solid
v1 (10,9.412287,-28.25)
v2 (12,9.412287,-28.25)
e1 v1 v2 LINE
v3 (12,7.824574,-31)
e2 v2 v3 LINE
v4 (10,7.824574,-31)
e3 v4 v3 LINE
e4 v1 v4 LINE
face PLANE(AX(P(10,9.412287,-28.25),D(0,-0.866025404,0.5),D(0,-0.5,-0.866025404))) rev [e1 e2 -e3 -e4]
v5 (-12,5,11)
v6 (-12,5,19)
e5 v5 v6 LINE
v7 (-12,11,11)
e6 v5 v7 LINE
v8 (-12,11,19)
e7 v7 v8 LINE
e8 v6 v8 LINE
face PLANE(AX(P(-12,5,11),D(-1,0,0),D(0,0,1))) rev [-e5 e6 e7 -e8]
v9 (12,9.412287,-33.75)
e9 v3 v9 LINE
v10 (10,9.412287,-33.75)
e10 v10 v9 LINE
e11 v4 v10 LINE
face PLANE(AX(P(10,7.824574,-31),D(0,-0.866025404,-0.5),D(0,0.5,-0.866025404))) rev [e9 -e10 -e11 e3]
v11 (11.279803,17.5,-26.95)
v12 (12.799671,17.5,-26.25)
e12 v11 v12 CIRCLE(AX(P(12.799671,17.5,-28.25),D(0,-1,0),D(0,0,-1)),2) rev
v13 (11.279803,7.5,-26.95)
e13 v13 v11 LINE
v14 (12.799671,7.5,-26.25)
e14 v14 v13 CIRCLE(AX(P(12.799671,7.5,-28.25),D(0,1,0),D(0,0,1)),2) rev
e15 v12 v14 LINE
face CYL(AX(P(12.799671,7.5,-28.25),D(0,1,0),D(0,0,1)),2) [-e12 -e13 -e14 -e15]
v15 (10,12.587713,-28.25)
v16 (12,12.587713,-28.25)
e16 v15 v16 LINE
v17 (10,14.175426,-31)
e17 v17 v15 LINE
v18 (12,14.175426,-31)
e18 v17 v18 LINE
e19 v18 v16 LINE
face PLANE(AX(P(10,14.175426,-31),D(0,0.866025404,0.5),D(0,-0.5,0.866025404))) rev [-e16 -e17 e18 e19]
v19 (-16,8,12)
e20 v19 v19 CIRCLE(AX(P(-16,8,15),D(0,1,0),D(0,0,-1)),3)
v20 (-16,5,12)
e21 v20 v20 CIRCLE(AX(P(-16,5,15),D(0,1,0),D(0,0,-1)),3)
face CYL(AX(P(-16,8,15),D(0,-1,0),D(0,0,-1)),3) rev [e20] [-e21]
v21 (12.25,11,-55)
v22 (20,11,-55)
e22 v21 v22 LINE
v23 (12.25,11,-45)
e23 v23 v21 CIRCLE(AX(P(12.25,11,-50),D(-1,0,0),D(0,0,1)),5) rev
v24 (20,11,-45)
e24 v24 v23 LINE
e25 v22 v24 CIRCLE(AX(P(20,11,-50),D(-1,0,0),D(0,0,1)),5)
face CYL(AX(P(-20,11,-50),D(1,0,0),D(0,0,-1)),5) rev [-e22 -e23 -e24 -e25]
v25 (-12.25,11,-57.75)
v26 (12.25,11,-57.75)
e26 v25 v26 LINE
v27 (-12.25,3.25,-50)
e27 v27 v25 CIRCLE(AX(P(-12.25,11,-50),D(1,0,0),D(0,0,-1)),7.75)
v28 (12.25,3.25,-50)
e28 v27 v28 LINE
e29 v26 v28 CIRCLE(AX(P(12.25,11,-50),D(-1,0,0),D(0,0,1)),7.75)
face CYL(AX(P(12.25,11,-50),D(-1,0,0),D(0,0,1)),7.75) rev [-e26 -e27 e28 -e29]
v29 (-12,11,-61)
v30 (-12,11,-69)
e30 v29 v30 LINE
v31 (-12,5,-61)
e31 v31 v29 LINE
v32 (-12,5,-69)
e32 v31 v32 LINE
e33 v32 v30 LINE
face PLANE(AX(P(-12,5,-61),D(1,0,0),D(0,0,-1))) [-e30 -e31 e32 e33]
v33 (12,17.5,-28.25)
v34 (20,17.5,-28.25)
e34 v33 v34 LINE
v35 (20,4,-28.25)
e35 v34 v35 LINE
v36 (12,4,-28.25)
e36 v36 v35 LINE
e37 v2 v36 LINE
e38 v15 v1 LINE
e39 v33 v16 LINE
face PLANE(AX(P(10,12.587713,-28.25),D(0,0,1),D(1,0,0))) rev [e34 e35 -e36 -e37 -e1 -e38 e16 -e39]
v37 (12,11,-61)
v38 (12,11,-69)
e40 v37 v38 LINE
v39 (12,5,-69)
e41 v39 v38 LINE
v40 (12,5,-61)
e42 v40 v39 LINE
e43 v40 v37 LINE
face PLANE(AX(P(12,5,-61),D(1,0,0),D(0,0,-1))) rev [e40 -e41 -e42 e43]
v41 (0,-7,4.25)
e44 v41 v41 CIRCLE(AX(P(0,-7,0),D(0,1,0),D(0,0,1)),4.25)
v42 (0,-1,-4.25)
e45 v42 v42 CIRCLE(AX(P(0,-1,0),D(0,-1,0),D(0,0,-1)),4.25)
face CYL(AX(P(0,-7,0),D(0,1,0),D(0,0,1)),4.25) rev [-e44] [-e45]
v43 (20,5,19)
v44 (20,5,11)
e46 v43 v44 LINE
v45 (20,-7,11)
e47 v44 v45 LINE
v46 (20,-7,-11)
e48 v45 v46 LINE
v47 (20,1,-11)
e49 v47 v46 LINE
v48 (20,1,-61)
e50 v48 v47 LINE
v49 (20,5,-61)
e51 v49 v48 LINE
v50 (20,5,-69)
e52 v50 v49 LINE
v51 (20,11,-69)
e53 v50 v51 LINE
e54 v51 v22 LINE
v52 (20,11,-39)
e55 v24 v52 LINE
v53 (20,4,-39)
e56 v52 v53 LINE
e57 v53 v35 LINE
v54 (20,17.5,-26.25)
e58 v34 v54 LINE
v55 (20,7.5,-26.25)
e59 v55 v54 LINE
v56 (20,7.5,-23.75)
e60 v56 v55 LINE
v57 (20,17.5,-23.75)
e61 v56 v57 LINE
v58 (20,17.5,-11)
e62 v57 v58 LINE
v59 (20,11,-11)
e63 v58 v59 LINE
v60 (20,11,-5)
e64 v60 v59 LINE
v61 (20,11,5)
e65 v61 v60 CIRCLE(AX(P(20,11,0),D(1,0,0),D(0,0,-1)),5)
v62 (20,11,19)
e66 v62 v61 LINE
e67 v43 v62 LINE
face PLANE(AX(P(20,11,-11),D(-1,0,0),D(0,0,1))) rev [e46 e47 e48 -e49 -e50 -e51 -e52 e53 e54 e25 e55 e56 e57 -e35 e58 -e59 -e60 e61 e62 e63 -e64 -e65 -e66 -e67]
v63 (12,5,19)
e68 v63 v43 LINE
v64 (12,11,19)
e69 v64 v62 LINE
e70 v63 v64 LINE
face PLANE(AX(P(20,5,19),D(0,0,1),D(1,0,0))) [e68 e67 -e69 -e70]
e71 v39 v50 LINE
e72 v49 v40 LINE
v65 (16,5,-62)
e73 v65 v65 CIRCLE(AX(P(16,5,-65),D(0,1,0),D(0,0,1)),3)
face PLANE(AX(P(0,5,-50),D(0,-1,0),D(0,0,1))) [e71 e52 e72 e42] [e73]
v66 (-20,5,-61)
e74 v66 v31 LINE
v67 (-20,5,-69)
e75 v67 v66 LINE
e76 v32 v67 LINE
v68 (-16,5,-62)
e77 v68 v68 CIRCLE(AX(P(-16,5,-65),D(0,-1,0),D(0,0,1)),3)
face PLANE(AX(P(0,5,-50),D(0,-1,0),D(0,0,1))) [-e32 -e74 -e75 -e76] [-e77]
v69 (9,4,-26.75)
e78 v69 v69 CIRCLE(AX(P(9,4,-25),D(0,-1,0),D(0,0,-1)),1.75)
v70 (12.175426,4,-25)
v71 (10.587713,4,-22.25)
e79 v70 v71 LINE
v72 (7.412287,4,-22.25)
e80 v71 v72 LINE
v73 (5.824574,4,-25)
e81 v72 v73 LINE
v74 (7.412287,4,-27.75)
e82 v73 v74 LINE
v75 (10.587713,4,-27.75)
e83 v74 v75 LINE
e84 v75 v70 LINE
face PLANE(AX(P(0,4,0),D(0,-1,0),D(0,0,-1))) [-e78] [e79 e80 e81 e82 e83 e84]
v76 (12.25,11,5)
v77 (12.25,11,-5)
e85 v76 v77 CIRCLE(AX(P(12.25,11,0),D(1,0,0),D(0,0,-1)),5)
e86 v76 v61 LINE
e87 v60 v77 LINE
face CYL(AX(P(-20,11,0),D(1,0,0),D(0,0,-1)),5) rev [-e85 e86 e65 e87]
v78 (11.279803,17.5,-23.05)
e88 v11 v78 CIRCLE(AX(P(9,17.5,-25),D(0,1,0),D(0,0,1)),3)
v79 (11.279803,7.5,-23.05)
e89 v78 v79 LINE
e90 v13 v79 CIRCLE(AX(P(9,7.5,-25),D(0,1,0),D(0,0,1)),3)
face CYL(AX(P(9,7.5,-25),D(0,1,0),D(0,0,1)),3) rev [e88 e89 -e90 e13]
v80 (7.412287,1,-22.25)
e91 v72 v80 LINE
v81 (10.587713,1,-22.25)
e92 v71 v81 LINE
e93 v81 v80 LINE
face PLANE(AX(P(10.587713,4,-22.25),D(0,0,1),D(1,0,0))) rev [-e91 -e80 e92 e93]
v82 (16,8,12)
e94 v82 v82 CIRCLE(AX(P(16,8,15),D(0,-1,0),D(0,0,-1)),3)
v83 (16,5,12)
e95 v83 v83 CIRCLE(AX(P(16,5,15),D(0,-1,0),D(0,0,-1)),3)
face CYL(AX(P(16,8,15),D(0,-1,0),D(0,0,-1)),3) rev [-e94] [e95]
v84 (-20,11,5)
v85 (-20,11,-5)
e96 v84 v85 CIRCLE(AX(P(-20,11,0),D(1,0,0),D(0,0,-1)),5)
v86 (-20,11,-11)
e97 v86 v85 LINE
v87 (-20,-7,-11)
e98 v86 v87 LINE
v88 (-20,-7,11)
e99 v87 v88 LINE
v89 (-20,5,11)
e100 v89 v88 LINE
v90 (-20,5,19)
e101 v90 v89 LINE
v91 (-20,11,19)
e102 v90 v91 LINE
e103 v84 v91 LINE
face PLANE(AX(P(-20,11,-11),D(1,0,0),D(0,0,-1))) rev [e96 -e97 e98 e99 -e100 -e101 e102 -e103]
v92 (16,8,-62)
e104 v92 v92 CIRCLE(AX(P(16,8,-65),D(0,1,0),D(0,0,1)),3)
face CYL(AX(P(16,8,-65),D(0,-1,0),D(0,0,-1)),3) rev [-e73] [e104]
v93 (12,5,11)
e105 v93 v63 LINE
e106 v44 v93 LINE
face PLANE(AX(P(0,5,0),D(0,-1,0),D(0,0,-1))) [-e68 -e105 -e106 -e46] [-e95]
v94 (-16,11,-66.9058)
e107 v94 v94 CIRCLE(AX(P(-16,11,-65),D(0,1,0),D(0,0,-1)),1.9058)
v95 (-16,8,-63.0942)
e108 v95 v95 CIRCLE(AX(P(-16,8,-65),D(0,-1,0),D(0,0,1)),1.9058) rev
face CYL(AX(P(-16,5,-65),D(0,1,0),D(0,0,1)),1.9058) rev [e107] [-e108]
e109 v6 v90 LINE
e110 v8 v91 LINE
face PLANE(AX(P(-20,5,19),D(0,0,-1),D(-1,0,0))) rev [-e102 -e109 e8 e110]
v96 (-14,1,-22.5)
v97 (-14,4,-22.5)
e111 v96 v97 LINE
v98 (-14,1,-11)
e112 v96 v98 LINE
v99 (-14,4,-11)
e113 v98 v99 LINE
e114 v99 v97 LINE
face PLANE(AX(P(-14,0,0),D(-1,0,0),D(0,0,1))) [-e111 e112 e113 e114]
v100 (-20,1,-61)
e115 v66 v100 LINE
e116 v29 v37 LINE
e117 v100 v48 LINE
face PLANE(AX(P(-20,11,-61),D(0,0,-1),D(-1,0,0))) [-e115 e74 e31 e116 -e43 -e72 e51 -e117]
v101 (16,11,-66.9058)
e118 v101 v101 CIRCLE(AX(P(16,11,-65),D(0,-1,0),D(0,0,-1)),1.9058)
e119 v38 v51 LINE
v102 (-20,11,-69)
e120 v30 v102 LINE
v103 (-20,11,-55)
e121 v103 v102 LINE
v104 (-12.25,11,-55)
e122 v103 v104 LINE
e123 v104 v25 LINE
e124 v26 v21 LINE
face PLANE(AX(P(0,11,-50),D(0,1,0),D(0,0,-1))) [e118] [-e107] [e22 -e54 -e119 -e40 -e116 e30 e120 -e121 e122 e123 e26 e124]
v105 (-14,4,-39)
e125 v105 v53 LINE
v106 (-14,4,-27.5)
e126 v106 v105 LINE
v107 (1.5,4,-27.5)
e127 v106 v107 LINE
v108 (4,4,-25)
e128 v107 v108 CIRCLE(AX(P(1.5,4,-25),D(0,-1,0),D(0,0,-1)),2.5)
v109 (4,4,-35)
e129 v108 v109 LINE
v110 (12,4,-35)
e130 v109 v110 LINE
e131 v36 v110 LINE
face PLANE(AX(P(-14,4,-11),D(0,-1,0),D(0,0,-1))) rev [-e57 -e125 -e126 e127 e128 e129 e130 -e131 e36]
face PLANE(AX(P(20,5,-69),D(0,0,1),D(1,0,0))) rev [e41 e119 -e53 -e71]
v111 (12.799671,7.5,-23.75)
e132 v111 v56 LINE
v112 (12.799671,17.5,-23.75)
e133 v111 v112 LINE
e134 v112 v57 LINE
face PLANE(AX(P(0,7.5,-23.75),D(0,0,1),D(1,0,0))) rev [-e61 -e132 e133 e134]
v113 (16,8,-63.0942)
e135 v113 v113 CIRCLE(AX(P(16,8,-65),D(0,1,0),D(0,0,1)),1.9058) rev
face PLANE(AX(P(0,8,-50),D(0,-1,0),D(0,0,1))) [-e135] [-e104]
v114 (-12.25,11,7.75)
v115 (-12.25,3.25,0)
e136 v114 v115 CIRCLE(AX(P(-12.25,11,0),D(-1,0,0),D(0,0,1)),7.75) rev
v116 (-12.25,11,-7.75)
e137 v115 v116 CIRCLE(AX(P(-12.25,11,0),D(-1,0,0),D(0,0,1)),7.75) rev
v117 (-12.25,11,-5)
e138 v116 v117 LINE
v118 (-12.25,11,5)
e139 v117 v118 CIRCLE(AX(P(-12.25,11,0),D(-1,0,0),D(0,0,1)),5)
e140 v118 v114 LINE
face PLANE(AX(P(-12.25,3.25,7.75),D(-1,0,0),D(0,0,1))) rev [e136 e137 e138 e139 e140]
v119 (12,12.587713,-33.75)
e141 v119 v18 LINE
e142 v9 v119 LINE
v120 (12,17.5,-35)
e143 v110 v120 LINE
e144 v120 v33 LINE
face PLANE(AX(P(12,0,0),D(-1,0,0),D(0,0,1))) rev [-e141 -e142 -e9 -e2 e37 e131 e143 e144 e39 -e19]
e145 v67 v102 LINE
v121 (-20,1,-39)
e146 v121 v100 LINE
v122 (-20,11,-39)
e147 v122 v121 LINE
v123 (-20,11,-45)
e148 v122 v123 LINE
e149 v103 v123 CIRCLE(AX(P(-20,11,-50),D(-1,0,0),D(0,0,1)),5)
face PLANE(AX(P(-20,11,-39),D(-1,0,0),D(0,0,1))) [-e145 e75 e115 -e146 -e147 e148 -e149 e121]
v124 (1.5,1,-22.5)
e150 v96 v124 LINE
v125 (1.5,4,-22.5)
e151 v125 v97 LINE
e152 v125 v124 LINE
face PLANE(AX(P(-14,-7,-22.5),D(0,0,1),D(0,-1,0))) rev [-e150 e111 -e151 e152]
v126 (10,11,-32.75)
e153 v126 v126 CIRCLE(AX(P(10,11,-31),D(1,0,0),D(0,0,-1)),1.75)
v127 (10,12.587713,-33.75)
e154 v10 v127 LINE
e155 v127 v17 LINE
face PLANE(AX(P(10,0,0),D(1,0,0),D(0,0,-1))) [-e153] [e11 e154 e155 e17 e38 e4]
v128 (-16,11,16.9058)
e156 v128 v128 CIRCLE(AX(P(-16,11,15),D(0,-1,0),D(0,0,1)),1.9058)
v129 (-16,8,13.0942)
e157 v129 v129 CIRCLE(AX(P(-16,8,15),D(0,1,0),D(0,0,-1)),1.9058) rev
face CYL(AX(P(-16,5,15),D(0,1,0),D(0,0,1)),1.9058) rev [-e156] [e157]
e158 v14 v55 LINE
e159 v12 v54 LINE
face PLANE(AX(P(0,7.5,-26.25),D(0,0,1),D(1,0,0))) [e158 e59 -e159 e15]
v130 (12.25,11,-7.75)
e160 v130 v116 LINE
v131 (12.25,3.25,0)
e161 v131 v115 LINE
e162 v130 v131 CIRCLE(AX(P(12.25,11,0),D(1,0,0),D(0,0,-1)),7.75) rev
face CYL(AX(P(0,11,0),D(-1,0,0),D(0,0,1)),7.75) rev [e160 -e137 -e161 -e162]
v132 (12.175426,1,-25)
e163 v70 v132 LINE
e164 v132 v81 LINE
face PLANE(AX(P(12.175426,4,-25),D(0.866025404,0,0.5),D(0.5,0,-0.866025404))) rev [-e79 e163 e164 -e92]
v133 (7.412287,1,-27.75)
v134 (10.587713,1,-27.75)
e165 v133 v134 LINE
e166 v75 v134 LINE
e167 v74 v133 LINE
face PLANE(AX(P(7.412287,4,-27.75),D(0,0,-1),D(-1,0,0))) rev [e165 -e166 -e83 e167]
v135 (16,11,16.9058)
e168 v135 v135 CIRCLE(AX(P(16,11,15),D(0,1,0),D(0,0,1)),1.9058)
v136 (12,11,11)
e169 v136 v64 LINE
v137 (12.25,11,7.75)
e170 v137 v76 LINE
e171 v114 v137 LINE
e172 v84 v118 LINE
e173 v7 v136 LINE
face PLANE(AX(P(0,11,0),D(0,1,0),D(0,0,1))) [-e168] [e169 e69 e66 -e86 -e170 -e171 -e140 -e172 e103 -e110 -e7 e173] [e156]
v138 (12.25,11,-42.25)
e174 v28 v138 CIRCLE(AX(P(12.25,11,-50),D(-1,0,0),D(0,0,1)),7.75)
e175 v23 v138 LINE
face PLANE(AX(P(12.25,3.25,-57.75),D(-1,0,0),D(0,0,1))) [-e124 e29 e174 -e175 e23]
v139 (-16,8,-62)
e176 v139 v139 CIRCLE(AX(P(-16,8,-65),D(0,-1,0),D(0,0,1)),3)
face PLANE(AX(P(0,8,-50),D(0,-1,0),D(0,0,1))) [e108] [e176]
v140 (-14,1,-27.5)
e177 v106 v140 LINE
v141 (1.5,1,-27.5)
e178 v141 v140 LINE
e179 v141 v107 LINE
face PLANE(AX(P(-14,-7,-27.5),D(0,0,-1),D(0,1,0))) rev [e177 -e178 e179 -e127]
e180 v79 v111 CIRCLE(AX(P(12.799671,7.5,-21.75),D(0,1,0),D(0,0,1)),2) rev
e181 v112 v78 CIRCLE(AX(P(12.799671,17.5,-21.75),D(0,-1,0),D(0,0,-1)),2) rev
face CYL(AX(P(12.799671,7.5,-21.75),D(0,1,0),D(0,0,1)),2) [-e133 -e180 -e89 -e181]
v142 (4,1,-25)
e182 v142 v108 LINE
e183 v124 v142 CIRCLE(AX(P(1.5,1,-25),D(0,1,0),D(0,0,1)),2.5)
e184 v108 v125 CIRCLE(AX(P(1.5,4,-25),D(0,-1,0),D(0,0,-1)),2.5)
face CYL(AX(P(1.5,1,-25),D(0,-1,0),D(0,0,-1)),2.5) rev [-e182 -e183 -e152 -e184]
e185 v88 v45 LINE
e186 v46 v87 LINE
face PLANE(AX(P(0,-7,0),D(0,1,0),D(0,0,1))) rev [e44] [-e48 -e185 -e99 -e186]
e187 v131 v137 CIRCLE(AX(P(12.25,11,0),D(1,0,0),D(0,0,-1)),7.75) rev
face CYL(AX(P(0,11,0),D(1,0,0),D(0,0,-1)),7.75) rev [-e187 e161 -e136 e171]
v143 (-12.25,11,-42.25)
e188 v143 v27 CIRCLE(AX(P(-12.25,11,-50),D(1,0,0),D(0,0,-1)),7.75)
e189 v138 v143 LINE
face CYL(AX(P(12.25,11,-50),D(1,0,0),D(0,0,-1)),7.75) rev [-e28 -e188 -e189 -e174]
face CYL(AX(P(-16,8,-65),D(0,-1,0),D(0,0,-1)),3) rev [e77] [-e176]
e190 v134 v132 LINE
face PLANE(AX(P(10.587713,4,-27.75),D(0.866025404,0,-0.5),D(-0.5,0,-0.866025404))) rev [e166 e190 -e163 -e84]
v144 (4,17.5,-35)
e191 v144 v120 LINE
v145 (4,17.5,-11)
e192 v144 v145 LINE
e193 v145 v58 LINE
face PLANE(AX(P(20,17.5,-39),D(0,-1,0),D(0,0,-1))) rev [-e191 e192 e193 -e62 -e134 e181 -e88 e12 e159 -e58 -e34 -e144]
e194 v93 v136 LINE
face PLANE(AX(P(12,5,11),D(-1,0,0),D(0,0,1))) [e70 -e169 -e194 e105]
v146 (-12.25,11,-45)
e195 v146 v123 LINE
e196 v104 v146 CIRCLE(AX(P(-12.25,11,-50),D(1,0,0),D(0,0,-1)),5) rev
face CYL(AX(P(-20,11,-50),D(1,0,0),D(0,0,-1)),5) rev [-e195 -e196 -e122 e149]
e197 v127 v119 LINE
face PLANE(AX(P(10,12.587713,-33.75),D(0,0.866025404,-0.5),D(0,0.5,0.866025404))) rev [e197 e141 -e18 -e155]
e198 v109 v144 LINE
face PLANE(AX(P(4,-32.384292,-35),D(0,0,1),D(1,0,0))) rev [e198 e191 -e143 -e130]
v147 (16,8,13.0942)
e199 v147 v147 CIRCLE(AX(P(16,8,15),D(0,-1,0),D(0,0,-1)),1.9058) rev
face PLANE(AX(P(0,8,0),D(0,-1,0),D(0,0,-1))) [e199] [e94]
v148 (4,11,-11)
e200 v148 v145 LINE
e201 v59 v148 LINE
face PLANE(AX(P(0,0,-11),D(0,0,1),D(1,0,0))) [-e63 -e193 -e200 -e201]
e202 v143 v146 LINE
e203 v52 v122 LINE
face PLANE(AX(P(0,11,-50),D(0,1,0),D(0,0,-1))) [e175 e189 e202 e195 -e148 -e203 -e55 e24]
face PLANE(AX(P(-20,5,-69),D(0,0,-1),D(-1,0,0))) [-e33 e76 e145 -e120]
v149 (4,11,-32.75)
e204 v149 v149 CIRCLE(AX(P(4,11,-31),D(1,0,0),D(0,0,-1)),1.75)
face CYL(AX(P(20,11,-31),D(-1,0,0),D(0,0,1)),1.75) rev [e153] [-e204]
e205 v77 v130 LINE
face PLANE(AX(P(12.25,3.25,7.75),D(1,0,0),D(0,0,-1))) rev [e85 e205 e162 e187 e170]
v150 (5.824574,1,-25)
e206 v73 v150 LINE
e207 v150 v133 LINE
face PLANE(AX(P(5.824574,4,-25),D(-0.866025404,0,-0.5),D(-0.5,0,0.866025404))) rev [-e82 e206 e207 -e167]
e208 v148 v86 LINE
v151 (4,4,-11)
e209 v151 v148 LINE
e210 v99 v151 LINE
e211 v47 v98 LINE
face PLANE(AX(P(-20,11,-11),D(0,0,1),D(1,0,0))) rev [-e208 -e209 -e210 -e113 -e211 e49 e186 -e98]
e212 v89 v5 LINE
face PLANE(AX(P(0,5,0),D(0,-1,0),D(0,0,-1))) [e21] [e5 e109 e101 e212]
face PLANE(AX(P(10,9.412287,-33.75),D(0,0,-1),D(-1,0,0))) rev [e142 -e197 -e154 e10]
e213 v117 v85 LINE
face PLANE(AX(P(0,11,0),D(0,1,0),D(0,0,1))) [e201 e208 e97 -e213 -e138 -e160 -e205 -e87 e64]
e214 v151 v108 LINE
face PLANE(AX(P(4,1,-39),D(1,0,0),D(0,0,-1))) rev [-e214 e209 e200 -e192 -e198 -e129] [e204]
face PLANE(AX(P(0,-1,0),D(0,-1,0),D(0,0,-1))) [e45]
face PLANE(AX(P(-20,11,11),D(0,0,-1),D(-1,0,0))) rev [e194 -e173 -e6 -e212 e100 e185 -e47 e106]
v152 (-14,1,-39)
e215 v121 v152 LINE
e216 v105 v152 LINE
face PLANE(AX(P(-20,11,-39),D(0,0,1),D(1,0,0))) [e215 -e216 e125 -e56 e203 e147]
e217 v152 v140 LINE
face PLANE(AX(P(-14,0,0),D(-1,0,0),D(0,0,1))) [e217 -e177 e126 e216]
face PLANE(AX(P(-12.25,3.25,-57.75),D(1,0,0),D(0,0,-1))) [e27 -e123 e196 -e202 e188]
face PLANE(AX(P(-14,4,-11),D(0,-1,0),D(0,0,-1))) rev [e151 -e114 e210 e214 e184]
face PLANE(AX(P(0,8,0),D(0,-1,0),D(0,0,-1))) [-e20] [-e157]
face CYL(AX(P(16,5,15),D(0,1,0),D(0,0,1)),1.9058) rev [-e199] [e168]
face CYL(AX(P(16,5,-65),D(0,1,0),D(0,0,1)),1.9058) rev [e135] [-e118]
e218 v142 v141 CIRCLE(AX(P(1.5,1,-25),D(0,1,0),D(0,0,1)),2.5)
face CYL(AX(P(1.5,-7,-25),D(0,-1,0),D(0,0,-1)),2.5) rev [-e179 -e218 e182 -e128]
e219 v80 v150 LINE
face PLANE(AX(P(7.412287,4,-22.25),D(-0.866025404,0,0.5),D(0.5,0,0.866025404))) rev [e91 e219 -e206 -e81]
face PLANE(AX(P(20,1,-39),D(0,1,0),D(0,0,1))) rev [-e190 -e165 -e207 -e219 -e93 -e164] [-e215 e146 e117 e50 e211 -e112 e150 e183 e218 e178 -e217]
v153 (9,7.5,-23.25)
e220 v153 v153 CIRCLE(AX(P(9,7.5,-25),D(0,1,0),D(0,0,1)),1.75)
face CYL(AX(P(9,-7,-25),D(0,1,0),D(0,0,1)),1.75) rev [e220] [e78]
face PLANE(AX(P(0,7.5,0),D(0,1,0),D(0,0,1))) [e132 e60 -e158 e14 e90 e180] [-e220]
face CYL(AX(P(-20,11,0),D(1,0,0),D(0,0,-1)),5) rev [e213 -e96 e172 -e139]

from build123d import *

# Parameters (mm, degrees)
SKETCH1_W                  = 40
SKETCH1_H                  = 22
BOSS_EXTRUDE1_DEPTH        = 11
SKETCH2_W                  = 40
SKETCH2_H                  = 22
SKETCH2_R                  = 4.25
BOSS_EXTRUDE2_DEPTH        = 7
SKETCH3_W                  = 24.5
SKETCH3_H                  = 15.5
CUT_EXTRUDE1_DEPTH         = 7.75
FILLET1_R                  = 7.75
SKETCH4_R                  = 5
CUT_EXTRUDE2_DEPTH         = 36.805900352
SKETCH5_W                  = 8
SKETCH5_H                  = 8
SKETCH5_R                  = 1.905800151
BOSS_EXTRUDE3_DEPTH        = 6
CUT_EXTRUDE3_START         = -3
SKETCH6_R                  = 3
SKETCH6_R_2                = 1.905800151
CUT_EXTRUDE3_DEPTH         = 3
SKETCH7_W                  = 16
SKETCH7_H                  = 16.5
BOSS_EXTRUDE5_DEPTH        = 28
MIRROR14_COPY_1_SKETCH_W   = 8
MIRROR14_COPY_1_SKETCH_H   = 8
MIRROR14_COPY_1_SKETCH_R   = 1.905800151
MIRROR14_COPY_1_DEPTH      = 6
MIRROR14_START             = -3
MIRROR14_COPY_2_SKETCH_R   = 3
MIRROR14_COPY_2_SKETCH_R_2 = 1.905800151
MIRROR14_COPY_2_DEPTH      = 3
FILLET1_OF_MIRROR14_R      = 7.75
SKETCH9_W                  = 28
SKETCH9_H                  = 3
BOSS_EXTRUDE6_DEPTH        = 18
CUT_EXTRUDE4_DEPTH         = 10
CUT_EXTRUDE5_DEPTH         = 74.288812243
CUT_EXTRUDE5_DEPTH_BACK    = 74.288812243
SKETCH11_R                 = 1.75
CUT_EXTRUDE6_DEPTH         = 76.121568141
CUT_EXTRUDE6_DEPTH_BACK    = 76.121568141
SKETCH12_R                 = 1.75
FILLET2_R                  = 2
CUT_EXTRUDE12_START        = -3
SKETCH17_R                 = 1.75
CUT_EXTRUDE12_DEPTH        = 3
CUT_EXTRUDE13_DEPTH        = 74.097537578
CUT_EXTRUDE13_DEPTH_BACK   = 74.097537578
SKETCH18_W                 = 18
SKETCH18_H                 = 5
FILLET3_R                  = 2.5
CUT_EXTRUDE14_DEPTH        = 74.710582687
CUT_EXTRUDE15_START        = -10
SKETCH21_R                 = 1.75
CUT_EXTRUDE15_DEPTH        = 10
SKETCH20_W                 = 36.163748027
SKETCH20_H                 = 4
CUT_EXTRUDE16_DEPTH        = 13.5
SKETCH22_W                 = 6.75
SKETCH22_H                 = 13.5
CUT_EXTRUDE18_DEPTH        = 8
SKETCH23_R                 = 4.25
BOSS_EXTRUDE8_DEPTH        = 1


with BuildPart() as part:
    # Sketch1 → Boss-Extrude1 (new body)
    with BuildSketch(Plane(origin=(0, 0, 0), x_dir=(1, 0, 0), z_dir=(0, 1, 0))):
        Rectangle(SKETCH1_W, SKETCH1_H)
    boss_extrude1 = extrude(amount=BOSS_EXTRUDE1_DEPTH)

    # Sketch2 → Boss-Extrude2 (add)
    with BuildSketch(Plane(origin=(0, 0, 0), x_dir=(1, 0, 0), z_dir=(0, 1, 0))):
        Rectangle(SKETCH2_W, SKETCH2_H)
        with Locations(Location((0, 0, 0), (0, 0, 270))):
            Circle(SKETCH2_R, mode=Mode.SUBTRACT)
    boss_extrude2 = extrude(amount=-BOSS_EXTRUDE2_DEPTH)

    # Sketch3 → Cut-Extrude1 (cut)
    with BuildSketch(Plane(origin=(0, 11, 0), x_dir=(1, 0, 0), z_dir=(0, 1, 0))):
        Rectangle(SKETCH3_W, SKETCH3_H)
    cut_extrude1 = extrude(amount=-CUT_EXTRUDE1_DEPTH, mode=Mode.SUBTRACT)

    # Fillet1
    fillet1_edges = [part.edges().sort_by_distance(p)[0] for p in [
        (0, 3.25, 7.75),
        (0, 3.25, -7.75),
    ]]
    fillet(fillet1_edges, radius=FILLET1_R - 0.0001)  # a hair under: the kernel refuses the full size

    # Sketch4 → Cut-Extrude2 (cut, symmetric)
    with BuildSketch(Plane(origin=(-12.25, 0, 0), x_dir=(0, 0, -1), z_dir=(1, 0, 0))):
        with Locations((0, 11)):
            Circle(SKETCH4_R)
    cut_extrude2 = extrude(amount=CUT_EXTRUDE2_DEPTH, both=True, mode=Mode.SUBTRACT)

    # Sketch5 → Boss-Extrude3 (add)
    with BuildSketch(Plane(origin=(0, 11, 0), x_dir=(1, 0, 0), z_dir=(0, 1, 0))):
        with Locations((16, -15)):
            Rectangle(SKETCH5_W, SKETCH5_H)
        with Locations(Location((16, -15, 0), (0, 0, 270))):
            Circle(SKETCH5_R, mode=Mode.SUBTRACT)
    boss_extrude3 = extrude(amount=-BOSS_EXTRUDE3_DEPTH)

    # Sketch6 → Cut-Extrude3 (cut)
    with BuildSketch(Plane.XZ.offset(-5).offset(CUT_EXTRUDE3_START)):
        with Locations(Location((16, 15, 0), (0, 0, 270))):
            Circle(SKETCH6_R)
        with Locations(Location((16, 15, 0), (0, 0, 90))):
            Circle(SKETCH6_R_2, mode=Mode.SUBTRACT)
    cut_extrude3 = extrude(amount=CUT_EXTRUDE3_DEPTH, mode=Mode.SUBTRACT)

    # Mirror8: Boss-Extrude3, Cut-Extrude3 across plane
    add(boss_extrude3.mirror(Plane(origin=(0, 0, 0), x_dir=(0, 0, 1), z_dir=(1, 0, 0))))
    add(cut_extrude3.mirror(Plane(origin=(0, 0, 0), x_dir=(0, 0, 1), z_dir=(1, 0, 0))), mode=Mode.SUBTRACT)

    # Sketch7 → Boss-Extrude5 (add)
    with BuildSketch(Plane(origin=(0, 0, -11), x_dir=(-1, 0, 0), z_dir=(0, 0, -1))):
        with Locations((-12, 9.25)):
            Rectangle(SKETCH7_W, SKETCH7_H)
    extrude(amount=BOSS_EXTRUDE5_DEPTH)

    # Mirror14: Boss-Extrude1, Boss-Extrude2, Cut-Extrude1, Cut-Extrude2, Boss-Extrude3, Cut-Extrude3 across plane
    add(boss_extrude1.mirror(Plane.XY.offset(-25)))
    add(boss_extrude2.mirror(Plane.XY.offset(-25)))
    add(cut_extrude1.mirror(Plane.XY.offset(-25)), mode=Mode.SUBTRACT)
    add(cut_extrude2.mirror(Plane.XY.offset(-25)), mode=Mode.SUBTRACT)
    add(boss_extrude3.mirror(Plane.XY.offset(-25)))
    add(cut_extrude3.mirror(Plane.XY.offset(-25)), mode=Mode.SUBTRACT)

    # Mirror14 copy 1 sketch → Mirror14 copy 1 (add)
    with BuildSketch(Plane(origin=(0, 11, -50), x_dir=(-1, 0, 0), z_dir=(0, 1, 0))):
        with Locations((16, -15)):
            Rectangle(MIRROR14_COPY_1_SKETCH_W, MIRROR14_COPY_1_SKETCH_H)
        with Locations(Location((16, -15, 0), (0, 0, 270))):
            Circle(MIRROR14_COPY_1_SKETCH_R, mode=Mode.SUBTRACT)
    extrude(amount=-MIRROR14_COPY_1_DEPTH)

    # Mirror14 copy 2 sketch → Mirror14 copy 2 (cut)
    with BuildSketch(Plane(origin=(0, 5, -50), x_dir=(-1, 0, 0), z_dir=(0, -1, 0)).offset(MIRROR14_START)):
        with Locations(Location((16, 15, 0), (0, 0, 270))):
            Circle(MIRROR14_COPY_2_SKETCH_R)
        with Locations(Location((16, 15, 0), (0, 0, 90))):
            Circle(MIRROR14_COPY_2_SKETCH_R_2, mode=Mode.SUBTRACT)
    extrude(amount=MIRROR14_COPY_2_DEPTH, mode=Mode.SUBTRACT)

    # Fillet1 of Mirror14
    fillet1_of_mirror14_edges = [part.edges().sort_by_distance(p)[0] for p in [
        (0, 3.25, -57.75),
        (0, 3.25, -42.25),
    ]]
    fillet(fillet1_of_mirror14_edges, radius=FILLET1_OF_MIRROR14_R - 0.0001)  # a hair under: the kernel refuses the full size

    # Sketch9 → Boss-Extrude6 (add)
    with BuildSketch(Plane.ZY.offset(-4)):
        with Locations((-25, 2.5)):
            Rectangle(SKETCH9_W, SKETCH9_H)
    extrude(amount=BOSS_EXTRUDE6_DEPTH)

    # Sketch10 → Cut-Extrude4 (cut)
    with BuildSketch(Plane(origin=(0, 17.5, 0), x_dir=(1, 0, 0), z_dir=(0, 1, 0))):
        with BuildLine():
            Line((9, 26.25), (9, 23.75))
            Line((9, 23.75), (11.727178029, 23.75))
            ThreePointArc((11.727178029, 23.75), (11.931001031, 24.360286817), (12, 25))
            ThreePointArc((12, 25), (11.931001031, 25.639713183), (11.727178029, 26.25))
            Line((11.727178029, 26.25), (9, 26.25))
        make_face()
        with BuildLine():
            Line((11.727178029, 23.75), (9, 23.75))
            Line((9, 23.75), (9, 26.25))
            Line((9, 26.25), (11.727178029, 26.25))
            ThreePointArc((11.727178029, 26.25), (6, 25), (11.727178029, 23.75))
        make_face()
        with BuildLine():
            ThreePointArc((12, 25), (11.931001031, 24.360286817), (11.727178029, 23.75))
            Line((11.727178029, 23.75), (20, 23.75))
            Line((20, 23.75), (20, 26.25))
            Line((20, 26.25), (11.727178029, 26.25))
            ThreePointArc((11.727178029, 26.25), (11.931001031, 25.639713183), (12, 25))
        make_face()
    extrude(amount=-CUT_EXTRUDE4_DEPTH, mode=Mode.SUBTRACT)

    # Sketch11 → Cut-Extrude5 (cut, two sides: drawn at the far end of the back side and taken through both)
    with BuildSketch(Plane(origin=(0, 7.5, 0), x_dir=(1, 0, 0), z_dir=(0, 1, 0)).offset(-CUT_EXTRUDE5_DEPTH_BACK)):
        with Locations(Location((9, 25, 0), (0, 0, 270))):
            Circle(SKETCH11_R)
    extrude(amount=CUT_EXTRUDE5_DEPTH + CUT_EXTRUDE5_DEPTH_BACK, mode=Mode.SUBTRACT)

    # Sketch12 → Cut-Extrude6 (cut, two sides: drawn at the far end of the back side and taken through both)
    with BuildSketch(Plane.ZY.offset(-4).offset(-CUT_EXTRUDE6_DEPTH_BACK)):
        with Locations((-31, 11)):
            Circle(SKETCH12_R)
    extrude(amount=CUT_EXTRUDE6_DEPTH + CUT_EXTRUDE6_DEPTH_BACK, mode=Mode.SUBTRACT)

    # Fillet2
    fillet2_edges = [part.edges().sort_by_distance(p)[0] for p in [
        (11.727178029, 12.5, -23.75),
        (11.727178029, 12.5, -26.25),
    ]]
    fillet(fillet2_edges, radius=FILLET2_R)

    # Sketch17 → Cut-Extrude12 (cut)
    with BuildSketch(Plane.XZ.offset(-1).offset(CUT_EXTRUDE12_START)):
        Polygon((12.175426481, -25), (10.58771324, -22.25), (7.41228676, -22.25), (5.824573519, -25), (7.41228676, -27.75), (10.58771324, -27.75), align=None)
        with Locations(Location((9, -25, 0), (0, 0, 90))):
            Circle(SKETCH17_R, mode=Mode.SUBTRACT)
    extrude(amount=CUT_EXTRUDE12_DEPTH, mode=Mode.SUBTRACT)

    # Sketch18 → Cut-Extrude13 (cut, two sides: drawn at the far end of the back side and taken through both)
    with BuildSketch(Plane(origin=(0, 4, 0), x_dir=(1, 0, 0), z_dir=(0, 1, 0)).offset(-CUT_EXTRUDE13_DEPTH_BACK)):
        with Locations((-5, 25)):
            Rectangle(SKETCH18_W, SKETCH18_H)
    extrude(amount=CUT_EXTRUDE13_DEPTH + CUT_EXTRUDE13_DEPTH_BACK, mode=Mode.SUBTRACT)

    # Fillet3
    fillet3_edges = [part.edges().sort_by_distance(p)[0] for p in [
        (4, 2.5, -27.5),
        (4, 2.5, -22.5),
    ]]
    fillet(fillet3_edges, radius=FILLET3_R - 0.0001)  # a hair under: the kernel refuses the full size

    # Sketch19 → Cut-Extrude14 (cut, through all)
    with BuildSketch(Plane.XZ.offset(-1)):
        Polygon((20, -61), (20, -39), (-14, -39), (-20, -39), (-20, -61), align=None)
    extrude(amount=CUT_EXTRUDE14_DEPTH, mode=Mode.SUBTRACT)

    # Sketch21 → Cut-Extrude15 (cut)
    with BuildSketch(Plane(origin=(20, 0, 0), x_dir=(0, 0, -1), z_dir=(1, 0, 0)).offset(CUT_EXTRUDE15_START)):
        Polygon((31, 14.175426481), (28.25, 12.58771324), (28.25, 9.41228676), (31, 7.824573519), (33.75, 9.41228676), (33.75, 12.58771324), align=None)
        with Locations((31, 11)):
            Circle(SKETCH21_R, mode=Mode.SUBTRACT)
    extrude(amount=CUT_EXTRUDE15_DEPTH, mode=Mode.SUBTRACT)

    # Sketch20 → Cut-Extrude16 (cut)
    with BuildSketch(Plane(origin=(0, 17.5, 0), x_dir=(1, 0, 0), z_dir=(0, 1, 0))):
        with Locations((22.081874014, 37)):
            Rectangle(SKETCH20_W, SKETCH20_H)
    extrude(amount=-CUT_EXTRUDE16_DEPTH, mode=Mode.SUBTRACT)

    # Sketch22 → Cut-Extrude18 (cut)
    with BuildSketch(Plane(origin=(20, 0, 0), x_dir=(0, 0, -1), z_dir=(1, 0, 0))):
        with Locations((31.625, 10.75)):
            Rectangle(SKETCH22_W, SKETCH22_H)
    extrude(amount=-CUT_EXTRUDE18_DEPTH, mode=Mode.SUBTRACT)

    # Sketch23 → Boss-Extrude8 (add)
    with BuildSketch(Plane.XZ):
        with Locations(Location((0, 0, 0), (0, 0, 90))):
            Circle(SKETCH23_R)
    extrude(amount=BOSS_EXTRUDE8_DEPTH)


solid = part.part
